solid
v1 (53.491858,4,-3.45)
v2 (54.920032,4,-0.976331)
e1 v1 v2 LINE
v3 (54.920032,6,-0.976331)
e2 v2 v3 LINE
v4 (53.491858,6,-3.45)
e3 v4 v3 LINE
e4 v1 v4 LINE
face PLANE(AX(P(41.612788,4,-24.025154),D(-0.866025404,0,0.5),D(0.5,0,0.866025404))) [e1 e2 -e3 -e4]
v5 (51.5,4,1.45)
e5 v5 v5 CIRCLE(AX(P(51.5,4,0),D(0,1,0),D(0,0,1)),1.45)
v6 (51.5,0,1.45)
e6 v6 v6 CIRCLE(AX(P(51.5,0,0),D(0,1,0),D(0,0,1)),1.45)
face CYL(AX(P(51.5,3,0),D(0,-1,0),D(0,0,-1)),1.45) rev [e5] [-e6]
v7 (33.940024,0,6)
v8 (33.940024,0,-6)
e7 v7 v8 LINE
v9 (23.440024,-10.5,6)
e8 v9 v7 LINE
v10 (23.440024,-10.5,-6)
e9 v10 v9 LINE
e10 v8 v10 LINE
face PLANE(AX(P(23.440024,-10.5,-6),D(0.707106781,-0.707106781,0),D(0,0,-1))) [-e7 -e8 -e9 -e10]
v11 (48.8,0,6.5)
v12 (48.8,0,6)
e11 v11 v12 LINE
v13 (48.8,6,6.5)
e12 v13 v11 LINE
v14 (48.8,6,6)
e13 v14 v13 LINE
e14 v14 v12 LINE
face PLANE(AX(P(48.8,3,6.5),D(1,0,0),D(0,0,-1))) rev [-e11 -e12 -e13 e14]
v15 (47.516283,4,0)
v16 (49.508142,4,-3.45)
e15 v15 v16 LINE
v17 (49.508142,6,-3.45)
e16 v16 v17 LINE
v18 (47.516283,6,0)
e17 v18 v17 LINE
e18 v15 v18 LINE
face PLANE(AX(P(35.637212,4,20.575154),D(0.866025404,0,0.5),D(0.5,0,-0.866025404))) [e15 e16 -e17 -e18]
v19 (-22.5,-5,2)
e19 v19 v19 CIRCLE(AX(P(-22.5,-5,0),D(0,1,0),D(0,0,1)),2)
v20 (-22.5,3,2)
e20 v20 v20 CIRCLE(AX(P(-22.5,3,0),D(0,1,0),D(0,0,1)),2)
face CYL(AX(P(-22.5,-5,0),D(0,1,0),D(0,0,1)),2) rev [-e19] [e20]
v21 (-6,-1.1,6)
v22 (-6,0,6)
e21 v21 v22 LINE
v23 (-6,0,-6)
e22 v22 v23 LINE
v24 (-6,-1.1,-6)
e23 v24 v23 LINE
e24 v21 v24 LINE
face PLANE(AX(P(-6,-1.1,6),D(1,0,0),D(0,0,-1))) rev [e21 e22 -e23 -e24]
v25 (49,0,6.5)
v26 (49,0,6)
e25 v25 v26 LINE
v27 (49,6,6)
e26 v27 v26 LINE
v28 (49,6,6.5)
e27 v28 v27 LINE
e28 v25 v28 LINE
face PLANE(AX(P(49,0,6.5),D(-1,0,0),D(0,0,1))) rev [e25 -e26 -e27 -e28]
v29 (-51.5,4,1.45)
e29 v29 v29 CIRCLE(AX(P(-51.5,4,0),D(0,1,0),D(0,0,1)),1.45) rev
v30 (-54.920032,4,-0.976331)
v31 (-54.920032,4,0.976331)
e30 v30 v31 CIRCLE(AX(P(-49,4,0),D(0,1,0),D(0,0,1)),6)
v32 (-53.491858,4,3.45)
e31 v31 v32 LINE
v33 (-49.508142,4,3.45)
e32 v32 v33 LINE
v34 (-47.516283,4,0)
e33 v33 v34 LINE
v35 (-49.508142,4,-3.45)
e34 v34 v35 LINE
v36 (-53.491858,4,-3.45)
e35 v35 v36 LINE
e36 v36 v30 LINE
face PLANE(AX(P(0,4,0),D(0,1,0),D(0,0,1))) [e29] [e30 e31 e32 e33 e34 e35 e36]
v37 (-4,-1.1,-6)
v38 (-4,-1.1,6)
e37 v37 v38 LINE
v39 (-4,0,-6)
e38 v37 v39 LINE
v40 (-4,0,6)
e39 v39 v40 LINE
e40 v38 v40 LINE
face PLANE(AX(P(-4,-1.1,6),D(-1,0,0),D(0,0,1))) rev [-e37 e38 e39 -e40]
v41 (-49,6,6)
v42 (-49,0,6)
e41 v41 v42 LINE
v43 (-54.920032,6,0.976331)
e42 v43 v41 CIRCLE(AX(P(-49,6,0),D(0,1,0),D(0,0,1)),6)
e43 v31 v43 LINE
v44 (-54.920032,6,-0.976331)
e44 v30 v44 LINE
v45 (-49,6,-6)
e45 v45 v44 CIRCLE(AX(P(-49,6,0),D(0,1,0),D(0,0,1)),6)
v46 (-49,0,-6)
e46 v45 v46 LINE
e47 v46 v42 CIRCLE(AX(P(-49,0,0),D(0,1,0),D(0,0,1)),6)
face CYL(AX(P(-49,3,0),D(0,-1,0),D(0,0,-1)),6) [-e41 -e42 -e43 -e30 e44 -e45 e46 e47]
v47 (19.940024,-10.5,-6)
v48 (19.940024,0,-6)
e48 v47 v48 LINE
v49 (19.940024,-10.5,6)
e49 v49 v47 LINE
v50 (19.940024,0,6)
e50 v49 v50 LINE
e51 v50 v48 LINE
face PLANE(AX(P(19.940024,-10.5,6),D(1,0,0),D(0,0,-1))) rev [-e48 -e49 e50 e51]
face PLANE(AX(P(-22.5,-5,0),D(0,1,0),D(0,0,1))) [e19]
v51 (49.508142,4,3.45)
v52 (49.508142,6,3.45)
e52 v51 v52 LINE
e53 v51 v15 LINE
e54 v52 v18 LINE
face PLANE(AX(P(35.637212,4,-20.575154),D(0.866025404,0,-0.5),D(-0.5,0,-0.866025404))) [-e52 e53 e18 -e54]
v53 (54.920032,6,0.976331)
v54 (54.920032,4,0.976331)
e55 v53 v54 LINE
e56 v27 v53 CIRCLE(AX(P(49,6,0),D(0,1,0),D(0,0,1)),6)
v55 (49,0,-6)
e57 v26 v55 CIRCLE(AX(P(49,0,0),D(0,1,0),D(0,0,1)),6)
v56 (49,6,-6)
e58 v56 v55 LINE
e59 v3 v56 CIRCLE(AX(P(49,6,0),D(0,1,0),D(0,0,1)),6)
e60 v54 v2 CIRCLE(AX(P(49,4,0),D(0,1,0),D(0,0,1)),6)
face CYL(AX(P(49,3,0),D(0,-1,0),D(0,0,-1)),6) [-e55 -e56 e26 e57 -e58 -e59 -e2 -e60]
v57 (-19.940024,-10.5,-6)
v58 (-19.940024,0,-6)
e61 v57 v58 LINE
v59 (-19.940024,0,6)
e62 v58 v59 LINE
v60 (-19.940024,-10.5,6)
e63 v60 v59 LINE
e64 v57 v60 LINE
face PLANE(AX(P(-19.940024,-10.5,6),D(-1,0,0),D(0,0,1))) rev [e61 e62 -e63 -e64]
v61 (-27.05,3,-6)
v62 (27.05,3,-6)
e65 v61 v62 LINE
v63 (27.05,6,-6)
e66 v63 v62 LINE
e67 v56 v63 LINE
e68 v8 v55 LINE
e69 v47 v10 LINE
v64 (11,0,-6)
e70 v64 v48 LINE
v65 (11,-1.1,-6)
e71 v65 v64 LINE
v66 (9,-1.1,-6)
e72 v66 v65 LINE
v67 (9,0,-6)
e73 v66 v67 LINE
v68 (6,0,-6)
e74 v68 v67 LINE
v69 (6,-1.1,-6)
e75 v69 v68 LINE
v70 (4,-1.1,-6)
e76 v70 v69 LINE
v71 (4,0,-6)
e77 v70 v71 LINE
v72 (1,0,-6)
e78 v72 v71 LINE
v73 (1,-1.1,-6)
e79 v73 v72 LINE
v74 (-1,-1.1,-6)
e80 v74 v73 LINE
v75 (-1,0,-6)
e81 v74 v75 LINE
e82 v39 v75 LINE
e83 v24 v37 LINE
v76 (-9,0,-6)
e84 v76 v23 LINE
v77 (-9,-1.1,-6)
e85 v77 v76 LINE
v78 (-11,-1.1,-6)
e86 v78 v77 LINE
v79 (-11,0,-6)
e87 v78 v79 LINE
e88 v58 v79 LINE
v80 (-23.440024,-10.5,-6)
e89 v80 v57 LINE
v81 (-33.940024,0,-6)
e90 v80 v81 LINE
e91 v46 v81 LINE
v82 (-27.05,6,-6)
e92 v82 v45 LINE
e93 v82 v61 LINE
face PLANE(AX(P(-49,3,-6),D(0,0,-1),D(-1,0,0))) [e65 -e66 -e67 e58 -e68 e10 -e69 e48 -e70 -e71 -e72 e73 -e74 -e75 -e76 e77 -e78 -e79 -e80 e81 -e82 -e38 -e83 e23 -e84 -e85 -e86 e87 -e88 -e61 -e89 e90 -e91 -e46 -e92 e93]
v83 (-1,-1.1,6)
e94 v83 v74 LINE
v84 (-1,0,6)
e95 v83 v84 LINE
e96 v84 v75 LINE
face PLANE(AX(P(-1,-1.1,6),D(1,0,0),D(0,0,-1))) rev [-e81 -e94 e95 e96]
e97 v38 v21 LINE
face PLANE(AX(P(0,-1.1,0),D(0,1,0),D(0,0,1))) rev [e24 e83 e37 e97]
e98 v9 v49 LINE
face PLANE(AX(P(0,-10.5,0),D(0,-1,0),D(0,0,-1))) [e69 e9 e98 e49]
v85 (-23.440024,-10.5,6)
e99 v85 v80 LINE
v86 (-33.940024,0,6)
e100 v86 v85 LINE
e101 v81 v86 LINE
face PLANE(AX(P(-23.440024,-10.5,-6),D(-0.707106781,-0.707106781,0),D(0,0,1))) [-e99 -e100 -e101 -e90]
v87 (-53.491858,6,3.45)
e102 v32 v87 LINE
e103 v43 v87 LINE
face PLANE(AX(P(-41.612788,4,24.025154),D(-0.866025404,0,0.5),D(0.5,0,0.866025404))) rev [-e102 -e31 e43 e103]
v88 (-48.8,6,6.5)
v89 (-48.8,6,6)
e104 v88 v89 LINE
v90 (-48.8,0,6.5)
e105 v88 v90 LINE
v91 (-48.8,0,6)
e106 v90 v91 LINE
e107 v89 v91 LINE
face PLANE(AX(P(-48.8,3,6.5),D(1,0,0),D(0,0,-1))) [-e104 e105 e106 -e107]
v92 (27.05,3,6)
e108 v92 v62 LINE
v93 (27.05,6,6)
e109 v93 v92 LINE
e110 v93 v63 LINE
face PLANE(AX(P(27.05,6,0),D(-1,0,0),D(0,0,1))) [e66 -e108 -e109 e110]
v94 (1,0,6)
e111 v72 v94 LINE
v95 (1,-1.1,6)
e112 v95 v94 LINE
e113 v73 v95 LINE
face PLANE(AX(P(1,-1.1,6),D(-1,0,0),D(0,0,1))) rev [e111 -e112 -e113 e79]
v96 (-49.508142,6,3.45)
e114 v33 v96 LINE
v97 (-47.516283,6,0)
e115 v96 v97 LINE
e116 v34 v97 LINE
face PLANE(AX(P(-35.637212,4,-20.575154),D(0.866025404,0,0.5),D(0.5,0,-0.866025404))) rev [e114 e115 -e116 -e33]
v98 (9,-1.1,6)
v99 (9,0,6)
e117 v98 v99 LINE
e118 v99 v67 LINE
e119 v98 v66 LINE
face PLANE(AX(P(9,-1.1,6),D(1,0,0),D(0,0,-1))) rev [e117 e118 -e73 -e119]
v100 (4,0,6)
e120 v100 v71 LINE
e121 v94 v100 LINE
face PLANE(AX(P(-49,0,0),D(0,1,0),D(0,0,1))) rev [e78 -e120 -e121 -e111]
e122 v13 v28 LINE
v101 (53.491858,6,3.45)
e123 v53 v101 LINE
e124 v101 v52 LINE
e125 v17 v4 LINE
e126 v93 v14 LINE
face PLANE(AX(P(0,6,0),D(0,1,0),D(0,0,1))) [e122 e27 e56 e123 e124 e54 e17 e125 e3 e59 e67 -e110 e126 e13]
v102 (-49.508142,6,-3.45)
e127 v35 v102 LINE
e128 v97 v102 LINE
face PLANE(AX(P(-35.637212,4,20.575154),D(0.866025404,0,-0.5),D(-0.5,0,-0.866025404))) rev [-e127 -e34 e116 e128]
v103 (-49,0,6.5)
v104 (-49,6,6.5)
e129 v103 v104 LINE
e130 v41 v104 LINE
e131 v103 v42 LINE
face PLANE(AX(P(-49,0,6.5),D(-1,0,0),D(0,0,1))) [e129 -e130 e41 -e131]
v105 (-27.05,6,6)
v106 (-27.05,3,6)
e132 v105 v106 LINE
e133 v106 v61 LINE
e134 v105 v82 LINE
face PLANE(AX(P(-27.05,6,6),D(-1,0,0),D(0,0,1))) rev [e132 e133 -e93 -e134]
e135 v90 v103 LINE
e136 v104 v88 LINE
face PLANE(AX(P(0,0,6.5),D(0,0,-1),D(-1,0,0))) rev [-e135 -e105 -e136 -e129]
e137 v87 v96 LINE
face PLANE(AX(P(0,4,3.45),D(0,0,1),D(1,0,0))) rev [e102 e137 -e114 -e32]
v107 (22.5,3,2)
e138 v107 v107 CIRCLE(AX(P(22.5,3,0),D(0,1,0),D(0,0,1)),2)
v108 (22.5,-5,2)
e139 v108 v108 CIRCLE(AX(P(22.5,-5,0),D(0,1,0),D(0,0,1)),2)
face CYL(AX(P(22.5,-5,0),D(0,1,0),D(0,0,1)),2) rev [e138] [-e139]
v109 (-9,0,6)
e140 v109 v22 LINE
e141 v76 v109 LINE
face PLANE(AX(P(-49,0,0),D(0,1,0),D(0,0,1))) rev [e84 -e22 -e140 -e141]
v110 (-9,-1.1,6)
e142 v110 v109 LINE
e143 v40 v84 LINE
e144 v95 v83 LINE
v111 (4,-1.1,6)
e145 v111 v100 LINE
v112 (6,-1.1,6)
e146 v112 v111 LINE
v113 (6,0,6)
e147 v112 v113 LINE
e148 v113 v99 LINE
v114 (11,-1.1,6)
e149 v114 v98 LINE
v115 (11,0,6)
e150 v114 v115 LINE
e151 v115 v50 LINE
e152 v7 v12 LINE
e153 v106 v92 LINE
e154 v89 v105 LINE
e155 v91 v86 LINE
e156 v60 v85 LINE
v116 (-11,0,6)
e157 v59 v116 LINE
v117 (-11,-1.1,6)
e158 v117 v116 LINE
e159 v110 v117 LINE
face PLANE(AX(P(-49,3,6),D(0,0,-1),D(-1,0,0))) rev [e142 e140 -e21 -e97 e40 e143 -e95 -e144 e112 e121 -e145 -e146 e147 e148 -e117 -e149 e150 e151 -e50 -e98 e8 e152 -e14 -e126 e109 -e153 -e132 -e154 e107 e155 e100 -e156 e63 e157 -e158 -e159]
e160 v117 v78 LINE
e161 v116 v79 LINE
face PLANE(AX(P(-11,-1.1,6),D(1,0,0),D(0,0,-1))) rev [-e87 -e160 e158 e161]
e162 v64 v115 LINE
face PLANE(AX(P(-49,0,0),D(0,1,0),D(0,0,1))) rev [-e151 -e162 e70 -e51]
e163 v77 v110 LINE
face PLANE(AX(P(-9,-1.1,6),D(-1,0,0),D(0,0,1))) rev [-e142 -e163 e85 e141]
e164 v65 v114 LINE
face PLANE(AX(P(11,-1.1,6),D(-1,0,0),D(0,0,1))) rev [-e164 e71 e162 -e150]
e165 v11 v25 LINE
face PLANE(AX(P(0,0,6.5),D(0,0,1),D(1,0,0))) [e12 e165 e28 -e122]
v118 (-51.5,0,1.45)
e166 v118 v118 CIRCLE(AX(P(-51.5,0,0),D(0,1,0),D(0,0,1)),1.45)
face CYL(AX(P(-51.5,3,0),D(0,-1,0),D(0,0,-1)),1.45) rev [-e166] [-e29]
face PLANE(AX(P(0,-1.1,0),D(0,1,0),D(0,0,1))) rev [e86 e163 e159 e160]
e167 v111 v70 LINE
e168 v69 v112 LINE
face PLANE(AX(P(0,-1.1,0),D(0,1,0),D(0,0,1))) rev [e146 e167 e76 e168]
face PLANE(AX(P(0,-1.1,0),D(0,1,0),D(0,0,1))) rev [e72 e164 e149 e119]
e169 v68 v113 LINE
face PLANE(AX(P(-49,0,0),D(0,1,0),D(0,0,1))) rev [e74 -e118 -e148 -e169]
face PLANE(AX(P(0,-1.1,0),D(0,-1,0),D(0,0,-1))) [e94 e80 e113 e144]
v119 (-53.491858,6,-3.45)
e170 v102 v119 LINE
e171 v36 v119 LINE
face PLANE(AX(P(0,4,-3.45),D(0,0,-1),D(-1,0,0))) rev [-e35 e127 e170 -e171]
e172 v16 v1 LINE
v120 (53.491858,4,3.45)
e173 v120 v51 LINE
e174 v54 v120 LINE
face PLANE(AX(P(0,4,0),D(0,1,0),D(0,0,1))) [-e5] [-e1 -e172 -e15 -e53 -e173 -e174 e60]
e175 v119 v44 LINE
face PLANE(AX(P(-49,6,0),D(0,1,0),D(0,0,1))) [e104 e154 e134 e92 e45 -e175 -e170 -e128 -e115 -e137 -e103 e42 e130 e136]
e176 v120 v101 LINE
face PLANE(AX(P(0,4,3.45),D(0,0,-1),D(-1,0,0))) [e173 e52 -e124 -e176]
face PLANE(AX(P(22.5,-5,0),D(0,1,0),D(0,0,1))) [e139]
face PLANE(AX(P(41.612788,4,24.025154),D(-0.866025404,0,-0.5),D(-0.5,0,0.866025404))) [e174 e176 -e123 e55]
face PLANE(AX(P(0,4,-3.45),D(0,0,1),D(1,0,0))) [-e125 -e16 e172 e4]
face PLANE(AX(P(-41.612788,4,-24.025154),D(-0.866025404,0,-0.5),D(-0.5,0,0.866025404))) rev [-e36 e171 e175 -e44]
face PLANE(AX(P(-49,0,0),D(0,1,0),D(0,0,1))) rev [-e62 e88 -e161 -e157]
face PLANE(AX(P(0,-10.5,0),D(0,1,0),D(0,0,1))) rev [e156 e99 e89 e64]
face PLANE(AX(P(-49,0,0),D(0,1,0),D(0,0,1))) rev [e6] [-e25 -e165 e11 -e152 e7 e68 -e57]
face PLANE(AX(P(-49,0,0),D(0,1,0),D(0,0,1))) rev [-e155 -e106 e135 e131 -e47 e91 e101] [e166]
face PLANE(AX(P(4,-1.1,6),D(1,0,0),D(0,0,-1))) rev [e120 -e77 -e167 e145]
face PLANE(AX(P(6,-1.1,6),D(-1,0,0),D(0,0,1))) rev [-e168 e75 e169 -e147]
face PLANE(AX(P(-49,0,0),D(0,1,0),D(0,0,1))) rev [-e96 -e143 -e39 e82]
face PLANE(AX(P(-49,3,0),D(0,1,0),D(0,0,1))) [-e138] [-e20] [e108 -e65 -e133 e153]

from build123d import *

# Parameters (mm, degrees)
SKETCH1_R                 = 1.45
BOSS_EXTRUDE1_DEPTH       = 3
SKETCH4_W                 = 3.5
SKETCH4_H                 = 12
BOSS_EXTRUDE3_DEPTH       = 10.5
SKETCH5_W                 = 2
SKETCH5_H                 = 12
BOSS_EXTRUDE4_DEPTH       = 1.1
SKETCH6_W                 = 0.2
SKETCH6_H                 = 3
BOSS_EXTRUDE5_DEPTH       = 0.5
CHAMFER1_SIZE             = 10.5
F_3_0MM_DOWEL_HOLE1_D     = 2.9
F_3_0MM_DOWEL_HOLE1_DEPTH = 13.5
SKETCH10_R                = 1.45
BOSS_EXTRUDE6_DEPTH       = 3
CUT_EXTRUDE1_START        = -2
SKETCH11_R                = 1.45
CUT_EXTRUDE1_DEPTH        = 2
SKETCH12_R                = 2
CUT_EXTRUDE2_DEPTH        = 8


with BuildPart() as part:
    # Sketch1 → Boss-Extrude1 (new body)
    with BuildSketch(Plane(origin=(0, 0, 0), x_dir=(1, 0, 0), z_dir=(0, 1, 0))):
        with BuildLine():
            Line((-49, 6), (49, 6))
            ThreePointArc((49, 6), (55, 0), (49, -6))
            Line((49, -6), (-49, -6))
            ThreePointArc((-49, -6), (-55, 0), (-49, 6))
        make_face()
        with Locations(Location((-51.5, 0, 0), (0, 0, 270))):
            Circle(SKETCH1_R, mode=Mode.SUBTRACT)
        with Locations(Location((51.5, 0, 0), (0, 0, 270))):
            Circle(SKETCH1_R, mode=Mode.SUBTRACT)
    extrude(amount=BOSS_EXTRUDE1_DEPTH)

    # Sketch4 → Boss-Extrude3 (add)
    with BuildSketch(Plane.XZ):
        with Locations((-21.690023983, 0)):
            Rectangle(SKETCH4_W, SKETCH4_H)
        with Locations((21.690023983, 0)):
            Rectangle(SKETCH4_W, SKETCH4_H)
    extrude(amount=BOSS_EXTRUDE3_DEPTH)

    # Sketch5 → Boss-Extrude4 (add)
    with BuildSketch(Plane.XZ):
        with Locations((5, 0)):
            Rectangle(SKETCH5_W, SKETCH5_H)
        Rectangle(SKETCH5_W, SKETCH5_H)
        with Locations((10, 0)):
            Rectangle(SKETCH5_W, SKETCH5_H)
        with Locations((-5, 0)):
            Rectangle(SKETCH5_W, SKETCH5_H)
        with Locations((-10, 0)):
            Rectangle(SKETCH5_W, SKETCH5_H)
    extrude(amount=BOSS_EXTRUDE4_DEPTH)

    # Sketch6 → Boss-Extrude5 (add)
    with BuildSketch(Plane.XY.offset(6)):
        with Locations((48.9, 1.5)):
            Rectangle(SKETCH6_W, SKETCH6_H)
        with Locations((-48.9, 1.5)):
            Rectangle(SKETCH6_W, SKETCH6_H)
    extrude(amount=BOSS_EXTRUDE5_DEPTH)

    # Chamfer1
    chamfer1_edges = [part.edges().sort_by_distance(p)[0] for p in [
        (-23.440023983, 0, 0),
        (23.440023983, 0, 0),
    ]]
    chamfer(chamfer1_edges, length=CHAMFER1_SIZE - 0.0001)  # a hair under: the kernel refuses the full size

    # Ø3.0mm Dowel Hole1
    with Locations(Plane(origin=(0, 3, 0), x_dir=(1, 0, 0), z_dir=(0, 1, 0))):
        with Locations((-51.5, 0), (51.5, 0)):
            Hole(F_3_0MM_DOWEL_HOLE1_D / 2, depth=F_3_0MM_DOWEL_HOLE1_DEPTH)

    # Sketch10 → Boss-Extrude6 (add)
    # profile 1 of 2: a face of its own
    with BuildSketch(Plane(origin=(0, 3, 0), x_dir=(1, 0, 0), z_dir=(0, 1, 0))):
        with BuildLine():
            Line((-48.8, -6), (-27.05, -6))
            Line((-27.05, -6), (-27.05, 6))
            Line((-27.05, 6), (-49, 6))
            ThreePointArc((-49, 6), (-55, 0), (-49, -6))
            Line((-49, -6), (-49, -6.5))
            Line((-49, -6.5), (-48.8, -6.5))
            Line((-48.8, -6.5), (-48.8, -6))
        make_face()
        with Locations(Location((-51.5, 0, 0), (0, 0, 270.000000001))):
            Circle(SKETCH10_R, mode=Mode.SUBTRACT)
    # profile 2 of 2: a face of its own
    with BuildSketch(Plane(origin=(0, 3, 0), x_dir=(1, 0, 0), z_dir=(0, 1, 0))):
        with BuildLine():
            Line((27.05, 6), (27.05, -6))
            Line((27.05, -6), (48.8, -6))
            Line((48.8, -6), (48.8, -6.5))
            Line((48.8, -6.5), (49, -6.5))
            Line((49, -6.5), (49, -6))
            ThreePointArc((49, -6), (55, 0), (49, 6))
            Line((49, 6), (27.05, 6))
        make_face()
        with Locations(Location((51.5, 0, 0), (0, 0, 270))):
            Circle(SKETCH10_R, mode=Mode.SUBTRACT)
    extrude(amount=BOSS_EXTRUDE6_DEPTH)

    # Sketch11 → Cut-Extrude1 (cut)
    # profile 1 of 2: a face of its own
    with BuildSketch(Plane(origin=(0, 6, 0), x_dir=(1, 0, 0), z_dir=(0, 1, 0)).offset(CUT_EXTRUDE1_START)):
        Polygon((53.491858429, 3.45), (55.483716857, 0), (53.491858429, -3.45), (49.508141571, -3.45), (47.516283143, 0), (49.508141571, 3.45), align=None)
    # profile 2 of 2: a face of its own
    with BuildSketch(Plane(origin=(0, 6, 0), x_dir=(1, 0, 0), z_dir=(0, 1, 0)).offset(CUT_EXTRUDE1_START)):
        Polygon((-47.516283143, 0), (-49.508141571, 3.45), (-53.491858429, 3.45), (-55.483716857, 0), (-53.491858429, -3.45), (-49.508141571, -3.45), align=None)
        with Locations(Location((-51.5, 0, 0), (0, 0, 270.000000001))):
            Circle(SKETCH11_R, mode=Mode.SUBTRACT)
    extrude(amount=CUT_EXTRUDE1_DEPTH, mode=Mode.SUBTRACT)

    # Sketch12 → Cut-Extrude2 (cut)
    with BuildSketch(Plane(origin=(0, 3, 0), x_dir=(1, 0, 0), z_dir=(0, 1, 0))):
        with Locations(Location((-22.5, 0, 0), (0, 0, 270))):
            Circle(SKETCH12_R)
        with Locations(Location((22.5, 0, 0), (0, 0, 270))):
            Circle(SKETCH12_R)
    extrude(amount=-CUT_EXTRUDE2_DEPTH, mode=Mode.SUBTRACT)


solid = part.part
